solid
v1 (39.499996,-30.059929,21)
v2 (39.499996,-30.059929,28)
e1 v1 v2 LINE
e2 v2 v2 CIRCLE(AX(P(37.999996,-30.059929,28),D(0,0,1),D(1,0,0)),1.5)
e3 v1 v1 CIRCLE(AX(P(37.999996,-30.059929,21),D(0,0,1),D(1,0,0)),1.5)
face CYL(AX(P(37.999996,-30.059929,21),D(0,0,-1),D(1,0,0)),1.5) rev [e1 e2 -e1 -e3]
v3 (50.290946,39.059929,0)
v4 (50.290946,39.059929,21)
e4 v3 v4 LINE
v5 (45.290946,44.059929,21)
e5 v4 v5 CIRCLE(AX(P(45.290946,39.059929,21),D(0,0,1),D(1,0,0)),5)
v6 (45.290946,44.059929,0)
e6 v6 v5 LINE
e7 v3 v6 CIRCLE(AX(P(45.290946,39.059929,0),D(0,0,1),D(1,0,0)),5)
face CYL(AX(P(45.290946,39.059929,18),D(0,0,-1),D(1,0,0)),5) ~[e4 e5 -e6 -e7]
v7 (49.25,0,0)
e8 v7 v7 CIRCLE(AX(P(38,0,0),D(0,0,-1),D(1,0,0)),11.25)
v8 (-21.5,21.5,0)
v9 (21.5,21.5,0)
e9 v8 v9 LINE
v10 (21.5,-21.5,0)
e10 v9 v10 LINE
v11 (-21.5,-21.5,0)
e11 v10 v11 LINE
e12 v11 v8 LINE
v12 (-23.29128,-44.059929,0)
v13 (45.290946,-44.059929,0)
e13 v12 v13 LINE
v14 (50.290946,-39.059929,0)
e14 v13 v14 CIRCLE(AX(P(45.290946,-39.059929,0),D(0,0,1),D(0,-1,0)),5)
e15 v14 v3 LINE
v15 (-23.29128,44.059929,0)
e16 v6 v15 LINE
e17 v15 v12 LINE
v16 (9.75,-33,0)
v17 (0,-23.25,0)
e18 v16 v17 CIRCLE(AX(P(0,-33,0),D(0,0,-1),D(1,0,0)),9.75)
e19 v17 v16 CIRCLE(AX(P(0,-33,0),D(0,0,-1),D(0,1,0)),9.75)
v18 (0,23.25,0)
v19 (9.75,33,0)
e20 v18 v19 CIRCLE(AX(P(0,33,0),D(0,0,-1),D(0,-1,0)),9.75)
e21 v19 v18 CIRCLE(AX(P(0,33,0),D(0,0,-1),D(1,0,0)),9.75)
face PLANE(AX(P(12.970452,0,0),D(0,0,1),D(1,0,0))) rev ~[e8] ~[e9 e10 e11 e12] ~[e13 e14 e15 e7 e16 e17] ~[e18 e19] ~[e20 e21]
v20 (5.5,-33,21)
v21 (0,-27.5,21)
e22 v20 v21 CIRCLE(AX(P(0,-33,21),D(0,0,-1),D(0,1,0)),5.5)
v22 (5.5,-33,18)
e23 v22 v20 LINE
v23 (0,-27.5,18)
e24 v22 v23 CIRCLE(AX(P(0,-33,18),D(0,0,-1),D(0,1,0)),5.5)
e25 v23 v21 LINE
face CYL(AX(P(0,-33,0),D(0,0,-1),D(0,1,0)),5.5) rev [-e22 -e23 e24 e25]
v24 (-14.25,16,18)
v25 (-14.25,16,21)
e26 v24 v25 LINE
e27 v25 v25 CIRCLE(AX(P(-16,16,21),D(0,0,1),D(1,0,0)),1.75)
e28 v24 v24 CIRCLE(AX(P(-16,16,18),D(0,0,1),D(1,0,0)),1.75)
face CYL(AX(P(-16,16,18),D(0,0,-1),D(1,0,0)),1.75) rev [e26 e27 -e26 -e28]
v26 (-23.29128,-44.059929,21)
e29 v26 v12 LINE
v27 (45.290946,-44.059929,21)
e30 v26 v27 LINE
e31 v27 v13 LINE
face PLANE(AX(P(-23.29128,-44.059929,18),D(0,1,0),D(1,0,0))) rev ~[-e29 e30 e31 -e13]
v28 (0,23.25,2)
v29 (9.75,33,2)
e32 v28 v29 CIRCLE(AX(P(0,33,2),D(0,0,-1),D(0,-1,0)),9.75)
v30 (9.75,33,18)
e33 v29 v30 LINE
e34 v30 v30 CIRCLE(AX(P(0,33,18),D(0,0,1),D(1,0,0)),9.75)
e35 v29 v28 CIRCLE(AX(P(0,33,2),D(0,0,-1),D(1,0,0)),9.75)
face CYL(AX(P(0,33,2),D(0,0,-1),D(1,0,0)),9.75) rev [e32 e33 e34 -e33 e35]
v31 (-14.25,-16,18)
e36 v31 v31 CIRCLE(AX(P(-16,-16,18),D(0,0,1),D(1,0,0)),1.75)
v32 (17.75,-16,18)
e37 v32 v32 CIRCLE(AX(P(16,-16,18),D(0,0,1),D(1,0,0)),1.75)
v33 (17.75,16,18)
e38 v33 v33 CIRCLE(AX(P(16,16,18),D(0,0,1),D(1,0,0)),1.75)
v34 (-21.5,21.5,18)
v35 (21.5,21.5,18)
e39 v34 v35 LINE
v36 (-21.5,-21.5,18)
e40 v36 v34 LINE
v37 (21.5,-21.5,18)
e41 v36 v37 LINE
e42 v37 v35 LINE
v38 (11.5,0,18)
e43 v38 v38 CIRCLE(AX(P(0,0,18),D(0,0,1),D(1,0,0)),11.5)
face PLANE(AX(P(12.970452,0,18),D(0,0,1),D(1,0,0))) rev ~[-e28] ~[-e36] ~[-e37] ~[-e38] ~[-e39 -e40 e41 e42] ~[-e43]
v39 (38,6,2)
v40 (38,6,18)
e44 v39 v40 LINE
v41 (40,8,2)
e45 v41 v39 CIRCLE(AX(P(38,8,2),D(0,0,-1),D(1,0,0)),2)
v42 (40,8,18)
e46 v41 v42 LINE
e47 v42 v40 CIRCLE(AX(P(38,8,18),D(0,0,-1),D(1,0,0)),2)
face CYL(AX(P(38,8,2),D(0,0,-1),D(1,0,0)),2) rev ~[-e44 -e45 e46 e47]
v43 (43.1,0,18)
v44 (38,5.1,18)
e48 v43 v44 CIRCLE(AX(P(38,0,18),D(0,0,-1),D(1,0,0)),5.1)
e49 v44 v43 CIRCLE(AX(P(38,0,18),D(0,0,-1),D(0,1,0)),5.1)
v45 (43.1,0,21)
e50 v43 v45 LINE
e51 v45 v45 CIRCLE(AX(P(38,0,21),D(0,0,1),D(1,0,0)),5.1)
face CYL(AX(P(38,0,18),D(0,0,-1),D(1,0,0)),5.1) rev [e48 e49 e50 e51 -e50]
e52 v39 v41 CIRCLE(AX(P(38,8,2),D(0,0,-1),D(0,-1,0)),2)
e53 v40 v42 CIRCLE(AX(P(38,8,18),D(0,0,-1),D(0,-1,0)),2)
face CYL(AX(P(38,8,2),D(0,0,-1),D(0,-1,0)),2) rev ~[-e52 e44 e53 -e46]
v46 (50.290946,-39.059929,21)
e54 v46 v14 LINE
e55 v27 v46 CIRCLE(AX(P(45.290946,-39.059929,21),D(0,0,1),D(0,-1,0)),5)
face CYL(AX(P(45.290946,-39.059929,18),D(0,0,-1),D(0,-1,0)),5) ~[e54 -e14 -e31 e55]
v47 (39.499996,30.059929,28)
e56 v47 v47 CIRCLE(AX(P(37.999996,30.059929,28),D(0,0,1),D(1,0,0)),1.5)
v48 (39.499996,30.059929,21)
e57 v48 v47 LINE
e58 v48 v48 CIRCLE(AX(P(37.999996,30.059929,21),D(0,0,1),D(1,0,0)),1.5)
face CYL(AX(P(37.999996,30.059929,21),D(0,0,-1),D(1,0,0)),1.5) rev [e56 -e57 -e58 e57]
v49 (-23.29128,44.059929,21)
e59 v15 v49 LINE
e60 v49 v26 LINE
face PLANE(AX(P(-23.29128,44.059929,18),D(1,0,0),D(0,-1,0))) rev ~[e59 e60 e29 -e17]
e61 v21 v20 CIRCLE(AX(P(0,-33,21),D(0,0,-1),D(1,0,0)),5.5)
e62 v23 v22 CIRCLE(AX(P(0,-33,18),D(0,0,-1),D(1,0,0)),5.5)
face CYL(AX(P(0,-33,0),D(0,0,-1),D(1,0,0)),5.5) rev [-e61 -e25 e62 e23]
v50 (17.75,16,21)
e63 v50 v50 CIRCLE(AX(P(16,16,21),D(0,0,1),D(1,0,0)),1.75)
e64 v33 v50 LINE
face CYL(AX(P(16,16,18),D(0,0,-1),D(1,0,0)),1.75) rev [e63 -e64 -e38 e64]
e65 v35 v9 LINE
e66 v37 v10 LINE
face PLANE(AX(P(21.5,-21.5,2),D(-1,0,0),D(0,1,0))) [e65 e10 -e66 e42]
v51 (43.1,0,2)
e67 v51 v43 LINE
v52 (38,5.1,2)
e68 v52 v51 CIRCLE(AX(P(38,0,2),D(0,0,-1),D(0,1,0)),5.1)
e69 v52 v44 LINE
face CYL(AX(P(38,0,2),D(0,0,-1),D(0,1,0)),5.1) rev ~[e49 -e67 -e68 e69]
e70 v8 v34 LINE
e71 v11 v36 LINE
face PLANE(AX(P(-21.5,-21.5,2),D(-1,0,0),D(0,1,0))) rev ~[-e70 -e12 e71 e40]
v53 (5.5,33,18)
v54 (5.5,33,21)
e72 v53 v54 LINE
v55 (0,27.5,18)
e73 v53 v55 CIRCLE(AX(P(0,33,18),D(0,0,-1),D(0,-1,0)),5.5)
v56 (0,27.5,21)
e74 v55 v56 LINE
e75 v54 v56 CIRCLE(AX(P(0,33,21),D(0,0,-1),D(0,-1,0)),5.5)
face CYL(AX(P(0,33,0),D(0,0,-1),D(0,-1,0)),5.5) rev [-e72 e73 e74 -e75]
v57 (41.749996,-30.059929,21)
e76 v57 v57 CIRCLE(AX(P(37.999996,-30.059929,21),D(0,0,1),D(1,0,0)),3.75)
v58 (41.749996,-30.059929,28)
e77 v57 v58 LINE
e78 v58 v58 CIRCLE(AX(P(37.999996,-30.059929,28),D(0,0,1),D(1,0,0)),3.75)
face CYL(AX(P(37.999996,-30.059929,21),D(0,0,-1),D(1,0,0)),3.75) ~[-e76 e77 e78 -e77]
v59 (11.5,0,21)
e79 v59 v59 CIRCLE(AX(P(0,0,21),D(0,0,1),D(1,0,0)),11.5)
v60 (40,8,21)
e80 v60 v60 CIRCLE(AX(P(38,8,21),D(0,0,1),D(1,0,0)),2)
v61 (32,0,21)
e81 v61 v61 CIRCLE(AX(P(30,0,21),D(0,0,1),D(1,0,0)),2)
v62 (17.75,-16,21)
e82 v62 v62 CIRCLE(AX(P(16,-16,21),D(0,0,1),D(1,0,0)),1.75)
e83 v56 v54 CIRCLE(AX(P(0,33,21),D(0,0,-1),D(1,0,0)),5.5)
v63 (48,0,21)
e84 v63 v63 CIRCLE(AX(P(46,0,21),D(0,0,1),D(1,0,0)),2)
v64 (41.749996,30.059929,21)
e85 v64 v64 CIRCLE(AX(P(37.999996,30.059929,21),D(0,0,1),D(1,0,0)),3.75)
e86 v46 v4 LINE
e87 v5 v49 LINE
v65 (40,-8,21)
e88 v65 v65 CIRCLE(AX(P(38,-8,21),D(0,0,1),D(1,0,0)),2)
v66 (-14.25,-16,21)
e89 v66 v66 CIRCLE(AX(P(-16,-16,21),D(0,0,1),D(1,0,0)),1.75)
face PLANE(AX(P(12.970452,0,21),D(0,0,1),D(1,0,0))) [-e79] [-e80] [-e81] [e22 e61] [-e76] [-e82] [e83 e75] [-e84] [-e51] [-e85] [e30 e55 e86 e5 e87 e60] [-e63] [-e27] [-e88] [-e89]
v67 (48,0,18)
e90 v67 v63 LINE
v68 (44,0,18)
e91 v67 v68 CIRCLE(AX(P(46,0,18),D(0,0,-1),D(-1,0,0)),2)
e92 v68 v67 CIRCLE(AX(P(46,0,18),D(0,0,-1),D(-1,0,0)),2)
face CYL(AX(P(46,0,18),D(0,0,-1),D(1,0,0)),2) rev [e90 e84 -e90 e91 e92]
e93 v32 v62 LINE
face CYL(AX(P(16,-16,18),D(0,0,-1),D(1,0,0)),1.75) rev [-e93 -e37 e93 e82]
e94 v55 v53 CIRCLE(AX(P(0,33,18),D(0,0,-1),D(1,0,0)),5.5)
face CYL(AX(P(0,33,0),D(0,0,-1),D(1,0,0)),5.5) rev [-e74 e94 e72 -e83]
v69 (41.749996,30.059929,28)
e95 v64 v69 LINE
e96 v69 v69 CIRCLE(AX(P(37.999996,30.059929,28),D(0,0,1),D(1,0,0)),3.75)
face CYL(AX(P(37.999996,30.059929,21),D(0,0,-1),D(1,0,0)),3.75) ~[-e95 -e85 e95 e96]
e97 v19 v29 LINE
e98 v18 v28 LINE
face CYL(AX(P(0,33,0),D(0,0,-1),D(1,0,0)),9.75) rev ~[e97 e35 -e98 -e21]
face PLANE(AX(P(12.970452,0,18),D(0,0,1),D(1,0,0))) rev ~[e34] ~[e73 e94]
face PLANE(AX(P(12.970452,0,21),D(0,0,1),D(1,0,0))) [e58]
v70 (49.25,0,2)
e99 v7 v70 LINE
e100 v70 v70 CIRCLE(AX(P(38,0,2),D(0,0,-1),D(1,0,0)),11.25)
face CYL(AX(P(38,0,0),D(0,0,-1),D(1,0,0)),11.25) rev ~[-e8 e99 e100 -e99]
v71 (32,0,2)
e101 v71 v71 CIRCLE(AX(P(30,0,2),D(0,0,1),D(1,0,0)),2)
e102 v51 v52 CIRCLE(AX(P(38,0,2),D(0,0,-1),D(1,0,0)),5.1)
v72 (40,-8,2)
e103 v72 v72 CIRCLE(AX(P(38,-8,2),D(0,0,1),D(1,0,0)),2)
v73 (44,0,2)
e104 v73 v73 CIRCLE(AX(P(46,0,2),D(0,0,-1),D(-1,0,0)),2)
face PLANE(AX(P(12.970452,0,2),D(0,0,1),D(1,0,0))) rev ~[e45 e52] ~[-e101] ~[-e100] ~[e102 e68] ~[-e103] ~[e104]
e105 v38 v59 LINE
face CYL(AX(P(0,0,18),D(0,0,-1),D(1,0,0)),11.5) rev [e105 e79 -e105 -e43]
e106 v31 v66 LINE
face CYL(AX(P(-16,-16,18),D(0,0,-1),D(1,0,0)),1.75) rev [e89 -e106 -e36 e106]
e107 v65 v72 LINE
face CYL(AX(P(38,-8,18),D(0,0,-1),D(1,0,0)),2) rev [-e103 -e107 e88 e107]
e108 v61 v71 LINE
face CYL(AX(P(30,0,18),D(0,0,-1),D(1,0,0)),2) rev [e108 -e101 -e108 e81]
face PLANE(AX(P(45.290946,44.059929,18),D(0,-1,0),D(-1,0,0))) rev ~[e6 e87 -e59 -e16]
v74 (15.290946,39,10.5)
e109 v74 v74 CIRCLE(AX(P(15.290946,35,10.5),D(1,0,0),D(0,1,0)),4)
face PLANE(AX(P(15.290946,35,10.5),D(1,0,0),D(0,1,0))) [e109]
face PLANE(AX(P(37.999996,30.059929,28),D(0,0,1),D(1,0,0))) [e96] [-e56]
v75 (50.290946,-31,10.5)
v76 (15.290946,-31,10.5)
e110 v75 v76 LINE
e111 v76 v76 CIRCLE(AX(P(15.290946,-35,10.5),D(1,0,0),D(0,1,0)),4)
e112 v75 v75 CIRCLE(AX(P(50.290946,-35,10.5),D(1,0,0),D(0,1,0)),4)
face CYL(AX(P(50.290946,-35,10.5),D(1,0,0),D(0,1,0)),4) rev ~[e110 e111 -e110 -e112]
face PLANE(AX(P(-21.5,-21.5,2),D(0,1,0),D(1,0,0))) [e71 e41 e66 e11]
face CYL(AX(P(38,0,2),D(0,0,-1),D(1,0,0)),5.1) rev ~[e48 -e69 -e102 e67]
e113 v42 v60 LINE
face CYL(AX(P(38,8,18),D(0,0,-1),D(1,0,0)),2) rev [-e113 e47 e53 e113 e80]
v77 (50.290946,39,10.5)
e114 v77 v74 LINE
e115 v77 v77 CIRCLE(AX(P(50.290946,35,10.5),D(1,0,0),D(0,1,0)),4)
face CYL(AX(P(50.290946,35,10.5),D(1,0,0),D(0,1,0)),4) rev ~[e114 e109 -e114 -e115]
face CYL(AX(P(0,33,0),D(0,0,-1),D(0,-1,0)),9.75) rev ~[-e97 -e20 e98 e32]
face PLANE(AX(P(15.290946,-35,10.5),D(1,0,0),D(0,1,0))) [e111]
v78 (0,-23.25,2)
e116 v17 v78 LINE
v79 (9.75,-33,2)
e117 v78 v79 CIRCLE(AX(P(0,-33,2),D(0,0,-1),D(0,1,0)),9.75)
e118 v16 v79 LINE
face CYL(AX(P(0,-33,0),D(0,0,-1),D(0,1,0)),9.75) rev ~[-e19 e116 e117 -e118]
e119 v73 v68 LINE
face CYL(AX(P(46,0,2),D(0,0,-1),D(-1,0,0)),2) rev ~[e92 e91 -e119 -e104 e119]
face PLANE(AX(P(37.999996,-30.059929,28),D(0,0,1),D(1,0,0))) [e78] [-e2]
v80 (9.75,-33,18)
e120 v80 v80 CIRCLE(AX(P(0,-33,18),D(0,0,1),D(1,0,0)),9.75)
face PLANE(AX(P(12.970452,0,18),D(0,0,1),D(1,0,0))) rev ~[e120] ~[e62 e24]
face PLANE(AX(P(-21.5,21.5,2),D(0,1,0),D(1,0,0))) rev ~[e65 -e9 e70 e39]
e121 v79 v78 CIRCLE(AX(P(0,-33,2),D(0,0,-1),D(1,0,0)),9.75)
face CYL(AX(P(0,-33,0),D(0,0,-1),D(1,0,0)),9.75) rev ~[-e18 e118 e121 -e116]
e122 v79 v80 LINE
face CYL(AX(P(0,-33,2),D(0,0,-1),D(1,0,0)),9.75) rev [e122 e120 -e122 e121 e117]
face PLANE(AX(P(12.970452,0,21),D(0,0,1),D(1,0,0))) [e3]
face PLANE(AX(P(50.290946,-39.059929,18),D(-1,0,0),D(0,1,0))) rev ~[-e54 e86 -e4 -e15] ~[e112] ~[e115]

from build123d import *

# Parameters (mm, degrees)
F1_DEPTH  = 2
F2_R      = 9.75
F2_W      = 43
F2_H      = 43
F2_R_2    = 11.25
F2_R_3    = 2
F3_DEPTH  = 16
F4_R      = 9.75
F4_R_2    = 2
F4_W      = 43
F4_H      = 43
F4_R_3    = 5.1
F4_R_4    = 1.75
F4_R_5    = 11.5
F5_DEPTH  = 3
F7_DEPTH  = 40
F6_R      = 4
F8_DEPTH  = 35
F9_R      = 3.75
F9_R_2    = 1.5
F10_DEPTH = 7


# Not quite as in the source:
# - after a boolean that leaves OpenCascade's solid faulty, fix() repairs it
# - a feature names something its author has since deleted; it is built from what else it names


with BuildPart() as f1:
    # F0 (on Top) → F1 (new body)
    with BuildSketch(Plane.XY):
        with BuildLine():
            Line((45.2909459174, 44.0599285066), (23.2912804931, 44.0599285066))
            Line((23.2912804931, 44.0599285066), (-23.2912804931, 44.0599285066))
            Line((-23.2912804931, 44.0599285066), (-23.2912804931, -44.0599285066))
            Line((-23.2912804931, -44.0599285066), (23.2912804931, -44.0599285066))
            Line((23.2912804931, -44.0599285066), (45.2909459174, -44.0599285066))
            ThreePointArc((45.2909459174, -44.0599285066), (48.8264798233, -42.5954624125), (50.2909459174, -39.0599285066))
            Line((50.2909459174, -39.0599285066), (50.2909459174, -23.5600714934))
            Line((50.2909459174, -23.5600714934), (50.2909459174, 23.5599285066))
            Line((50.2909459174, 23.5599285066), (50.2909459174, 39.0599285066))
            ThreePointArc((50.2909459174, 39.0599285066), (48.8264798233, 42.5954624125), (45.2909459174, 44.0599285066))
        make_face()
        with BuildLine():
            ThreePointArc((9.75, -33), (-6.8942911166, -39.8942911166), (0, -23.25))
            ThreePointArc((0, -23.25), (6.8942911166, -26.1057088834), (9.75, -33))
        make_face(mode=Mode.SUBTRACT)
        Polygon((21.5, 21.5), (21.5, 0), (21.5, -21.5), (0, -21.5), (-21.5, -21.5), (-21.5, 21.5), (0, 21.5), (21.4772019535, 21.5), align=None, mode=Mode.SUBTRACT)
        with BuildLine():
            ThreePointArc((9.75, 33), (6.8942911166, 26.1057088834), (0, 23.25))
            ThreePointArc((0, 23.25), (-6.8942911166, 39.8942911166), (9.75, 33))
        make_face(mode=Mode.SUBTRACT)
        with BuildLine():
            ThreePointArc((26.75, 0), (38, 11.25), (49.25, 0))
            ThreePointArc((49.25, 0), (38, -11.25), (26.75, 0))
        make_face(mode=Mode.SUBTRACT)
    extrude(amount=F1_DEPTH)

    # F2 (on face) → F3 (join)
    with BuildSketch(Plane.XY.offset(2)):
        with BuildLine():
            ThreePointArc((50.2909459174, 39.0599285066), (48.8264798233, 42.5954624125), (45.2909459174, 44.0599285066))
            Line((45.2909459174, 44.0599285066), (-23.2912804931, 44.0599285066))
            Line((-23.2912804931, 44.0599285066), (-23.2912804931, -44.0599285066))
            Line((-23.2912804931, -44.0599285066), (45.2909459174, -44.0599285066))
            ThreePointArc((45.2909459174, -44.0599285066), (48.8264798233, -42.5954624125), (50.2909459174, -39.0599285066))
            Line((50.2909459174, -39.0599285066), (50.2909459174, 39.0599285066))
        make_face()
        with Locations((0, -33)):
            Circle(F2_R, mode=Mode.SUBTRACT)
        Rectangle(F2_W, F2_H, mode=Mode.SUBTRACT)
        with Locations((0, 33)):
            Circle(F2_R, mode=Mode.SUBTRACT)
        with Locations((38, 0)):
            Circle(F2_R_2, mode=Mode.SUBTRACT)
        with Locations((38, 0)):
            Circle(F2_R_2)
        with Locations((38, -8)):
            Circle(F2_R_3, mode=Mode.SUBTRACT)
        with Locations((30, 0)):
            Circle(F2_R_3, mode=Mode.SUBTRACT)
        with BuildLine():
            ThreePointArc((38, 5.1), (41.6062445841, 3.6062445841), (43.1, 0))
            ThreePointArc((43.1, 0), (34.3937554159, -3.6062445841), (38, 5.1))
        make_face(mode=Mode.SUBTRACT)
        with BuildLine():
            ThreePointArc((40, 8), (39.4142135624, 6.5857864376), (38, 6))
            ThreePointArc((38, 6), (36.5857864376, 9.4142135624), (40, 8))
        make_face(mode=Mode.SUBTRACT)
        with BuildLine():
            ThreePointArc((48, 0), (46, -2), (44, 0))
            ThreePointArc((44, 0), (46, 2), (48, 0))
        make_face(mode=Mode.SUBTRACT)
    extrude(amount=F3_DEPTH)

    # F4 (on face) → F5 (join)
    with BuildSketch(Plane.XY.offset(18)):
        with BuildLine():
            Line((50.2909459174, -39.0599285066), (50.2909459174, 39.0599285066))
            ThreePointArc((50.2909459174, 39.0599285066), (48.8264798233, 42.5954624125), (45.2909459174, 44.0599285066))
            Line((45.2909459174, 44.0599285066), (-23.2912804931, 44.0599285066))
            Line((-23.2912804931, 44.0599285066), (-23.2912804931, -44.0599285066))
            Line((-23.2912804931, -44.0599285066), (45.2909459174, -44.0599285066))
            ThreePointArc((45.2909459174, -44.0599285066), (48.8264798233, -42.5954624125), (50.2909459174, -39.0599285066))
        make_face()
        with Locations((0, -33)):
            Circle(F4_R, mode=Mode.SUBTRACT)
        with Locations((38, -8)):
            Circle(F4_R_2, mode=Mode.SUBTRACT)
        Rectangle(F4_W, F4_H, mode=Mode.SUBTRACT)
        with Locations((0, 33)):
            Circle(F4_R, mode=Mode.SUBTRACT)
        with Locations((30, 0)):
            Circle(F4_R_2, mode=Mode.SUBTRACT)
        with Locations((38, 0)):
            Circle(F4_R_3, mode=Mode.SUBTRACT)
        with Locations((38, 8)):
            Circle(F4_R_2, mode=Mode.SUBTRACT)
        with Locations((46, 0)):
            Circle(F4_R_2, mode=Mode.SUBTRACT)
        Rectangle(F4_W, F4_H)
        with Locations((-16, -16)):
            Circle(F4_R_4, mode=Mode.SUBTRACT)
        with Locations((16, -16)):
            Circle(F4_R_4, mode=Mode.SUBTRACT)
        with Locations((-16, 16)):
            Circle(F4_R_4, mode=Mode.SUBTRACT)
        Circle(F4_R_5, mode=Mode.SUBTRACT)
        with Locations((16, 16)):
            Circle(F4_R_4, mode=Mode.SUBTRACT)
        with Locations((0, -33)):
            Circle(F4_R)
        with Locations((0, 33)):
            Circle(F4_R)
    extrude(amount=F5_DEPTH)

    # F0 (on Top) → F7 (cut)
    with BuildSketch(Plane.XY):
        with BuildLine():
            ThreePointArc((5.5, -33), (3.8890872965, -29.1109127035), (0, -27.5))
            ThreePointArc((0, -27.5), (-3.8890872965, -36.8890872965), (5.5, -33))
        make_face()
        with BuildLine():
            ThreePointArc((5.5, 33), (-3.8890872965, 36.8890872965), (0, 27.5))
            ThreePointArc((0, 27.5), (3.8890872965, 29.1109127035), (5.5, 33))
        make_face()
    extrude(amount=F7_DEPTH, mode=Mode.SUBTRACT)

    add(f1.part.fix(), mode=Mode.REPLACE)

    # F6 (on face) → F8 (cut)
    with BuildSketch(Plane.YZ.offset(50.2909459174)):
        with Locations((35, 10.5)):
            Circle(F6_R)
        with Locations((-35, 10.5)):
            Circle(F6_R)
    extrude(amount=-F8_DEPTH, mode=Mode.SUBTRACT)

    # F9 (on face) → F10 (join)
    with BuildSketch(Plane.XY.offset(21)):
        with Locations((37.9999959174, 30.0599285066)):
            Circle(F9_R)
        with Locations((37.9999959174, 30.0599285066)):
            Circle(F9_R_2, mode=Mode.SUBTRACT)
        with Locations((37.9999959174, -30.0599285066)):
            Circle(F9_R)
        with Locations((37.9999959174, -30.0599285066)):
            Circle(F9_R_2, mode=Mode.SUBTRACT)
    extrude(amount=F10_DEPTH)


solid = f1.part
